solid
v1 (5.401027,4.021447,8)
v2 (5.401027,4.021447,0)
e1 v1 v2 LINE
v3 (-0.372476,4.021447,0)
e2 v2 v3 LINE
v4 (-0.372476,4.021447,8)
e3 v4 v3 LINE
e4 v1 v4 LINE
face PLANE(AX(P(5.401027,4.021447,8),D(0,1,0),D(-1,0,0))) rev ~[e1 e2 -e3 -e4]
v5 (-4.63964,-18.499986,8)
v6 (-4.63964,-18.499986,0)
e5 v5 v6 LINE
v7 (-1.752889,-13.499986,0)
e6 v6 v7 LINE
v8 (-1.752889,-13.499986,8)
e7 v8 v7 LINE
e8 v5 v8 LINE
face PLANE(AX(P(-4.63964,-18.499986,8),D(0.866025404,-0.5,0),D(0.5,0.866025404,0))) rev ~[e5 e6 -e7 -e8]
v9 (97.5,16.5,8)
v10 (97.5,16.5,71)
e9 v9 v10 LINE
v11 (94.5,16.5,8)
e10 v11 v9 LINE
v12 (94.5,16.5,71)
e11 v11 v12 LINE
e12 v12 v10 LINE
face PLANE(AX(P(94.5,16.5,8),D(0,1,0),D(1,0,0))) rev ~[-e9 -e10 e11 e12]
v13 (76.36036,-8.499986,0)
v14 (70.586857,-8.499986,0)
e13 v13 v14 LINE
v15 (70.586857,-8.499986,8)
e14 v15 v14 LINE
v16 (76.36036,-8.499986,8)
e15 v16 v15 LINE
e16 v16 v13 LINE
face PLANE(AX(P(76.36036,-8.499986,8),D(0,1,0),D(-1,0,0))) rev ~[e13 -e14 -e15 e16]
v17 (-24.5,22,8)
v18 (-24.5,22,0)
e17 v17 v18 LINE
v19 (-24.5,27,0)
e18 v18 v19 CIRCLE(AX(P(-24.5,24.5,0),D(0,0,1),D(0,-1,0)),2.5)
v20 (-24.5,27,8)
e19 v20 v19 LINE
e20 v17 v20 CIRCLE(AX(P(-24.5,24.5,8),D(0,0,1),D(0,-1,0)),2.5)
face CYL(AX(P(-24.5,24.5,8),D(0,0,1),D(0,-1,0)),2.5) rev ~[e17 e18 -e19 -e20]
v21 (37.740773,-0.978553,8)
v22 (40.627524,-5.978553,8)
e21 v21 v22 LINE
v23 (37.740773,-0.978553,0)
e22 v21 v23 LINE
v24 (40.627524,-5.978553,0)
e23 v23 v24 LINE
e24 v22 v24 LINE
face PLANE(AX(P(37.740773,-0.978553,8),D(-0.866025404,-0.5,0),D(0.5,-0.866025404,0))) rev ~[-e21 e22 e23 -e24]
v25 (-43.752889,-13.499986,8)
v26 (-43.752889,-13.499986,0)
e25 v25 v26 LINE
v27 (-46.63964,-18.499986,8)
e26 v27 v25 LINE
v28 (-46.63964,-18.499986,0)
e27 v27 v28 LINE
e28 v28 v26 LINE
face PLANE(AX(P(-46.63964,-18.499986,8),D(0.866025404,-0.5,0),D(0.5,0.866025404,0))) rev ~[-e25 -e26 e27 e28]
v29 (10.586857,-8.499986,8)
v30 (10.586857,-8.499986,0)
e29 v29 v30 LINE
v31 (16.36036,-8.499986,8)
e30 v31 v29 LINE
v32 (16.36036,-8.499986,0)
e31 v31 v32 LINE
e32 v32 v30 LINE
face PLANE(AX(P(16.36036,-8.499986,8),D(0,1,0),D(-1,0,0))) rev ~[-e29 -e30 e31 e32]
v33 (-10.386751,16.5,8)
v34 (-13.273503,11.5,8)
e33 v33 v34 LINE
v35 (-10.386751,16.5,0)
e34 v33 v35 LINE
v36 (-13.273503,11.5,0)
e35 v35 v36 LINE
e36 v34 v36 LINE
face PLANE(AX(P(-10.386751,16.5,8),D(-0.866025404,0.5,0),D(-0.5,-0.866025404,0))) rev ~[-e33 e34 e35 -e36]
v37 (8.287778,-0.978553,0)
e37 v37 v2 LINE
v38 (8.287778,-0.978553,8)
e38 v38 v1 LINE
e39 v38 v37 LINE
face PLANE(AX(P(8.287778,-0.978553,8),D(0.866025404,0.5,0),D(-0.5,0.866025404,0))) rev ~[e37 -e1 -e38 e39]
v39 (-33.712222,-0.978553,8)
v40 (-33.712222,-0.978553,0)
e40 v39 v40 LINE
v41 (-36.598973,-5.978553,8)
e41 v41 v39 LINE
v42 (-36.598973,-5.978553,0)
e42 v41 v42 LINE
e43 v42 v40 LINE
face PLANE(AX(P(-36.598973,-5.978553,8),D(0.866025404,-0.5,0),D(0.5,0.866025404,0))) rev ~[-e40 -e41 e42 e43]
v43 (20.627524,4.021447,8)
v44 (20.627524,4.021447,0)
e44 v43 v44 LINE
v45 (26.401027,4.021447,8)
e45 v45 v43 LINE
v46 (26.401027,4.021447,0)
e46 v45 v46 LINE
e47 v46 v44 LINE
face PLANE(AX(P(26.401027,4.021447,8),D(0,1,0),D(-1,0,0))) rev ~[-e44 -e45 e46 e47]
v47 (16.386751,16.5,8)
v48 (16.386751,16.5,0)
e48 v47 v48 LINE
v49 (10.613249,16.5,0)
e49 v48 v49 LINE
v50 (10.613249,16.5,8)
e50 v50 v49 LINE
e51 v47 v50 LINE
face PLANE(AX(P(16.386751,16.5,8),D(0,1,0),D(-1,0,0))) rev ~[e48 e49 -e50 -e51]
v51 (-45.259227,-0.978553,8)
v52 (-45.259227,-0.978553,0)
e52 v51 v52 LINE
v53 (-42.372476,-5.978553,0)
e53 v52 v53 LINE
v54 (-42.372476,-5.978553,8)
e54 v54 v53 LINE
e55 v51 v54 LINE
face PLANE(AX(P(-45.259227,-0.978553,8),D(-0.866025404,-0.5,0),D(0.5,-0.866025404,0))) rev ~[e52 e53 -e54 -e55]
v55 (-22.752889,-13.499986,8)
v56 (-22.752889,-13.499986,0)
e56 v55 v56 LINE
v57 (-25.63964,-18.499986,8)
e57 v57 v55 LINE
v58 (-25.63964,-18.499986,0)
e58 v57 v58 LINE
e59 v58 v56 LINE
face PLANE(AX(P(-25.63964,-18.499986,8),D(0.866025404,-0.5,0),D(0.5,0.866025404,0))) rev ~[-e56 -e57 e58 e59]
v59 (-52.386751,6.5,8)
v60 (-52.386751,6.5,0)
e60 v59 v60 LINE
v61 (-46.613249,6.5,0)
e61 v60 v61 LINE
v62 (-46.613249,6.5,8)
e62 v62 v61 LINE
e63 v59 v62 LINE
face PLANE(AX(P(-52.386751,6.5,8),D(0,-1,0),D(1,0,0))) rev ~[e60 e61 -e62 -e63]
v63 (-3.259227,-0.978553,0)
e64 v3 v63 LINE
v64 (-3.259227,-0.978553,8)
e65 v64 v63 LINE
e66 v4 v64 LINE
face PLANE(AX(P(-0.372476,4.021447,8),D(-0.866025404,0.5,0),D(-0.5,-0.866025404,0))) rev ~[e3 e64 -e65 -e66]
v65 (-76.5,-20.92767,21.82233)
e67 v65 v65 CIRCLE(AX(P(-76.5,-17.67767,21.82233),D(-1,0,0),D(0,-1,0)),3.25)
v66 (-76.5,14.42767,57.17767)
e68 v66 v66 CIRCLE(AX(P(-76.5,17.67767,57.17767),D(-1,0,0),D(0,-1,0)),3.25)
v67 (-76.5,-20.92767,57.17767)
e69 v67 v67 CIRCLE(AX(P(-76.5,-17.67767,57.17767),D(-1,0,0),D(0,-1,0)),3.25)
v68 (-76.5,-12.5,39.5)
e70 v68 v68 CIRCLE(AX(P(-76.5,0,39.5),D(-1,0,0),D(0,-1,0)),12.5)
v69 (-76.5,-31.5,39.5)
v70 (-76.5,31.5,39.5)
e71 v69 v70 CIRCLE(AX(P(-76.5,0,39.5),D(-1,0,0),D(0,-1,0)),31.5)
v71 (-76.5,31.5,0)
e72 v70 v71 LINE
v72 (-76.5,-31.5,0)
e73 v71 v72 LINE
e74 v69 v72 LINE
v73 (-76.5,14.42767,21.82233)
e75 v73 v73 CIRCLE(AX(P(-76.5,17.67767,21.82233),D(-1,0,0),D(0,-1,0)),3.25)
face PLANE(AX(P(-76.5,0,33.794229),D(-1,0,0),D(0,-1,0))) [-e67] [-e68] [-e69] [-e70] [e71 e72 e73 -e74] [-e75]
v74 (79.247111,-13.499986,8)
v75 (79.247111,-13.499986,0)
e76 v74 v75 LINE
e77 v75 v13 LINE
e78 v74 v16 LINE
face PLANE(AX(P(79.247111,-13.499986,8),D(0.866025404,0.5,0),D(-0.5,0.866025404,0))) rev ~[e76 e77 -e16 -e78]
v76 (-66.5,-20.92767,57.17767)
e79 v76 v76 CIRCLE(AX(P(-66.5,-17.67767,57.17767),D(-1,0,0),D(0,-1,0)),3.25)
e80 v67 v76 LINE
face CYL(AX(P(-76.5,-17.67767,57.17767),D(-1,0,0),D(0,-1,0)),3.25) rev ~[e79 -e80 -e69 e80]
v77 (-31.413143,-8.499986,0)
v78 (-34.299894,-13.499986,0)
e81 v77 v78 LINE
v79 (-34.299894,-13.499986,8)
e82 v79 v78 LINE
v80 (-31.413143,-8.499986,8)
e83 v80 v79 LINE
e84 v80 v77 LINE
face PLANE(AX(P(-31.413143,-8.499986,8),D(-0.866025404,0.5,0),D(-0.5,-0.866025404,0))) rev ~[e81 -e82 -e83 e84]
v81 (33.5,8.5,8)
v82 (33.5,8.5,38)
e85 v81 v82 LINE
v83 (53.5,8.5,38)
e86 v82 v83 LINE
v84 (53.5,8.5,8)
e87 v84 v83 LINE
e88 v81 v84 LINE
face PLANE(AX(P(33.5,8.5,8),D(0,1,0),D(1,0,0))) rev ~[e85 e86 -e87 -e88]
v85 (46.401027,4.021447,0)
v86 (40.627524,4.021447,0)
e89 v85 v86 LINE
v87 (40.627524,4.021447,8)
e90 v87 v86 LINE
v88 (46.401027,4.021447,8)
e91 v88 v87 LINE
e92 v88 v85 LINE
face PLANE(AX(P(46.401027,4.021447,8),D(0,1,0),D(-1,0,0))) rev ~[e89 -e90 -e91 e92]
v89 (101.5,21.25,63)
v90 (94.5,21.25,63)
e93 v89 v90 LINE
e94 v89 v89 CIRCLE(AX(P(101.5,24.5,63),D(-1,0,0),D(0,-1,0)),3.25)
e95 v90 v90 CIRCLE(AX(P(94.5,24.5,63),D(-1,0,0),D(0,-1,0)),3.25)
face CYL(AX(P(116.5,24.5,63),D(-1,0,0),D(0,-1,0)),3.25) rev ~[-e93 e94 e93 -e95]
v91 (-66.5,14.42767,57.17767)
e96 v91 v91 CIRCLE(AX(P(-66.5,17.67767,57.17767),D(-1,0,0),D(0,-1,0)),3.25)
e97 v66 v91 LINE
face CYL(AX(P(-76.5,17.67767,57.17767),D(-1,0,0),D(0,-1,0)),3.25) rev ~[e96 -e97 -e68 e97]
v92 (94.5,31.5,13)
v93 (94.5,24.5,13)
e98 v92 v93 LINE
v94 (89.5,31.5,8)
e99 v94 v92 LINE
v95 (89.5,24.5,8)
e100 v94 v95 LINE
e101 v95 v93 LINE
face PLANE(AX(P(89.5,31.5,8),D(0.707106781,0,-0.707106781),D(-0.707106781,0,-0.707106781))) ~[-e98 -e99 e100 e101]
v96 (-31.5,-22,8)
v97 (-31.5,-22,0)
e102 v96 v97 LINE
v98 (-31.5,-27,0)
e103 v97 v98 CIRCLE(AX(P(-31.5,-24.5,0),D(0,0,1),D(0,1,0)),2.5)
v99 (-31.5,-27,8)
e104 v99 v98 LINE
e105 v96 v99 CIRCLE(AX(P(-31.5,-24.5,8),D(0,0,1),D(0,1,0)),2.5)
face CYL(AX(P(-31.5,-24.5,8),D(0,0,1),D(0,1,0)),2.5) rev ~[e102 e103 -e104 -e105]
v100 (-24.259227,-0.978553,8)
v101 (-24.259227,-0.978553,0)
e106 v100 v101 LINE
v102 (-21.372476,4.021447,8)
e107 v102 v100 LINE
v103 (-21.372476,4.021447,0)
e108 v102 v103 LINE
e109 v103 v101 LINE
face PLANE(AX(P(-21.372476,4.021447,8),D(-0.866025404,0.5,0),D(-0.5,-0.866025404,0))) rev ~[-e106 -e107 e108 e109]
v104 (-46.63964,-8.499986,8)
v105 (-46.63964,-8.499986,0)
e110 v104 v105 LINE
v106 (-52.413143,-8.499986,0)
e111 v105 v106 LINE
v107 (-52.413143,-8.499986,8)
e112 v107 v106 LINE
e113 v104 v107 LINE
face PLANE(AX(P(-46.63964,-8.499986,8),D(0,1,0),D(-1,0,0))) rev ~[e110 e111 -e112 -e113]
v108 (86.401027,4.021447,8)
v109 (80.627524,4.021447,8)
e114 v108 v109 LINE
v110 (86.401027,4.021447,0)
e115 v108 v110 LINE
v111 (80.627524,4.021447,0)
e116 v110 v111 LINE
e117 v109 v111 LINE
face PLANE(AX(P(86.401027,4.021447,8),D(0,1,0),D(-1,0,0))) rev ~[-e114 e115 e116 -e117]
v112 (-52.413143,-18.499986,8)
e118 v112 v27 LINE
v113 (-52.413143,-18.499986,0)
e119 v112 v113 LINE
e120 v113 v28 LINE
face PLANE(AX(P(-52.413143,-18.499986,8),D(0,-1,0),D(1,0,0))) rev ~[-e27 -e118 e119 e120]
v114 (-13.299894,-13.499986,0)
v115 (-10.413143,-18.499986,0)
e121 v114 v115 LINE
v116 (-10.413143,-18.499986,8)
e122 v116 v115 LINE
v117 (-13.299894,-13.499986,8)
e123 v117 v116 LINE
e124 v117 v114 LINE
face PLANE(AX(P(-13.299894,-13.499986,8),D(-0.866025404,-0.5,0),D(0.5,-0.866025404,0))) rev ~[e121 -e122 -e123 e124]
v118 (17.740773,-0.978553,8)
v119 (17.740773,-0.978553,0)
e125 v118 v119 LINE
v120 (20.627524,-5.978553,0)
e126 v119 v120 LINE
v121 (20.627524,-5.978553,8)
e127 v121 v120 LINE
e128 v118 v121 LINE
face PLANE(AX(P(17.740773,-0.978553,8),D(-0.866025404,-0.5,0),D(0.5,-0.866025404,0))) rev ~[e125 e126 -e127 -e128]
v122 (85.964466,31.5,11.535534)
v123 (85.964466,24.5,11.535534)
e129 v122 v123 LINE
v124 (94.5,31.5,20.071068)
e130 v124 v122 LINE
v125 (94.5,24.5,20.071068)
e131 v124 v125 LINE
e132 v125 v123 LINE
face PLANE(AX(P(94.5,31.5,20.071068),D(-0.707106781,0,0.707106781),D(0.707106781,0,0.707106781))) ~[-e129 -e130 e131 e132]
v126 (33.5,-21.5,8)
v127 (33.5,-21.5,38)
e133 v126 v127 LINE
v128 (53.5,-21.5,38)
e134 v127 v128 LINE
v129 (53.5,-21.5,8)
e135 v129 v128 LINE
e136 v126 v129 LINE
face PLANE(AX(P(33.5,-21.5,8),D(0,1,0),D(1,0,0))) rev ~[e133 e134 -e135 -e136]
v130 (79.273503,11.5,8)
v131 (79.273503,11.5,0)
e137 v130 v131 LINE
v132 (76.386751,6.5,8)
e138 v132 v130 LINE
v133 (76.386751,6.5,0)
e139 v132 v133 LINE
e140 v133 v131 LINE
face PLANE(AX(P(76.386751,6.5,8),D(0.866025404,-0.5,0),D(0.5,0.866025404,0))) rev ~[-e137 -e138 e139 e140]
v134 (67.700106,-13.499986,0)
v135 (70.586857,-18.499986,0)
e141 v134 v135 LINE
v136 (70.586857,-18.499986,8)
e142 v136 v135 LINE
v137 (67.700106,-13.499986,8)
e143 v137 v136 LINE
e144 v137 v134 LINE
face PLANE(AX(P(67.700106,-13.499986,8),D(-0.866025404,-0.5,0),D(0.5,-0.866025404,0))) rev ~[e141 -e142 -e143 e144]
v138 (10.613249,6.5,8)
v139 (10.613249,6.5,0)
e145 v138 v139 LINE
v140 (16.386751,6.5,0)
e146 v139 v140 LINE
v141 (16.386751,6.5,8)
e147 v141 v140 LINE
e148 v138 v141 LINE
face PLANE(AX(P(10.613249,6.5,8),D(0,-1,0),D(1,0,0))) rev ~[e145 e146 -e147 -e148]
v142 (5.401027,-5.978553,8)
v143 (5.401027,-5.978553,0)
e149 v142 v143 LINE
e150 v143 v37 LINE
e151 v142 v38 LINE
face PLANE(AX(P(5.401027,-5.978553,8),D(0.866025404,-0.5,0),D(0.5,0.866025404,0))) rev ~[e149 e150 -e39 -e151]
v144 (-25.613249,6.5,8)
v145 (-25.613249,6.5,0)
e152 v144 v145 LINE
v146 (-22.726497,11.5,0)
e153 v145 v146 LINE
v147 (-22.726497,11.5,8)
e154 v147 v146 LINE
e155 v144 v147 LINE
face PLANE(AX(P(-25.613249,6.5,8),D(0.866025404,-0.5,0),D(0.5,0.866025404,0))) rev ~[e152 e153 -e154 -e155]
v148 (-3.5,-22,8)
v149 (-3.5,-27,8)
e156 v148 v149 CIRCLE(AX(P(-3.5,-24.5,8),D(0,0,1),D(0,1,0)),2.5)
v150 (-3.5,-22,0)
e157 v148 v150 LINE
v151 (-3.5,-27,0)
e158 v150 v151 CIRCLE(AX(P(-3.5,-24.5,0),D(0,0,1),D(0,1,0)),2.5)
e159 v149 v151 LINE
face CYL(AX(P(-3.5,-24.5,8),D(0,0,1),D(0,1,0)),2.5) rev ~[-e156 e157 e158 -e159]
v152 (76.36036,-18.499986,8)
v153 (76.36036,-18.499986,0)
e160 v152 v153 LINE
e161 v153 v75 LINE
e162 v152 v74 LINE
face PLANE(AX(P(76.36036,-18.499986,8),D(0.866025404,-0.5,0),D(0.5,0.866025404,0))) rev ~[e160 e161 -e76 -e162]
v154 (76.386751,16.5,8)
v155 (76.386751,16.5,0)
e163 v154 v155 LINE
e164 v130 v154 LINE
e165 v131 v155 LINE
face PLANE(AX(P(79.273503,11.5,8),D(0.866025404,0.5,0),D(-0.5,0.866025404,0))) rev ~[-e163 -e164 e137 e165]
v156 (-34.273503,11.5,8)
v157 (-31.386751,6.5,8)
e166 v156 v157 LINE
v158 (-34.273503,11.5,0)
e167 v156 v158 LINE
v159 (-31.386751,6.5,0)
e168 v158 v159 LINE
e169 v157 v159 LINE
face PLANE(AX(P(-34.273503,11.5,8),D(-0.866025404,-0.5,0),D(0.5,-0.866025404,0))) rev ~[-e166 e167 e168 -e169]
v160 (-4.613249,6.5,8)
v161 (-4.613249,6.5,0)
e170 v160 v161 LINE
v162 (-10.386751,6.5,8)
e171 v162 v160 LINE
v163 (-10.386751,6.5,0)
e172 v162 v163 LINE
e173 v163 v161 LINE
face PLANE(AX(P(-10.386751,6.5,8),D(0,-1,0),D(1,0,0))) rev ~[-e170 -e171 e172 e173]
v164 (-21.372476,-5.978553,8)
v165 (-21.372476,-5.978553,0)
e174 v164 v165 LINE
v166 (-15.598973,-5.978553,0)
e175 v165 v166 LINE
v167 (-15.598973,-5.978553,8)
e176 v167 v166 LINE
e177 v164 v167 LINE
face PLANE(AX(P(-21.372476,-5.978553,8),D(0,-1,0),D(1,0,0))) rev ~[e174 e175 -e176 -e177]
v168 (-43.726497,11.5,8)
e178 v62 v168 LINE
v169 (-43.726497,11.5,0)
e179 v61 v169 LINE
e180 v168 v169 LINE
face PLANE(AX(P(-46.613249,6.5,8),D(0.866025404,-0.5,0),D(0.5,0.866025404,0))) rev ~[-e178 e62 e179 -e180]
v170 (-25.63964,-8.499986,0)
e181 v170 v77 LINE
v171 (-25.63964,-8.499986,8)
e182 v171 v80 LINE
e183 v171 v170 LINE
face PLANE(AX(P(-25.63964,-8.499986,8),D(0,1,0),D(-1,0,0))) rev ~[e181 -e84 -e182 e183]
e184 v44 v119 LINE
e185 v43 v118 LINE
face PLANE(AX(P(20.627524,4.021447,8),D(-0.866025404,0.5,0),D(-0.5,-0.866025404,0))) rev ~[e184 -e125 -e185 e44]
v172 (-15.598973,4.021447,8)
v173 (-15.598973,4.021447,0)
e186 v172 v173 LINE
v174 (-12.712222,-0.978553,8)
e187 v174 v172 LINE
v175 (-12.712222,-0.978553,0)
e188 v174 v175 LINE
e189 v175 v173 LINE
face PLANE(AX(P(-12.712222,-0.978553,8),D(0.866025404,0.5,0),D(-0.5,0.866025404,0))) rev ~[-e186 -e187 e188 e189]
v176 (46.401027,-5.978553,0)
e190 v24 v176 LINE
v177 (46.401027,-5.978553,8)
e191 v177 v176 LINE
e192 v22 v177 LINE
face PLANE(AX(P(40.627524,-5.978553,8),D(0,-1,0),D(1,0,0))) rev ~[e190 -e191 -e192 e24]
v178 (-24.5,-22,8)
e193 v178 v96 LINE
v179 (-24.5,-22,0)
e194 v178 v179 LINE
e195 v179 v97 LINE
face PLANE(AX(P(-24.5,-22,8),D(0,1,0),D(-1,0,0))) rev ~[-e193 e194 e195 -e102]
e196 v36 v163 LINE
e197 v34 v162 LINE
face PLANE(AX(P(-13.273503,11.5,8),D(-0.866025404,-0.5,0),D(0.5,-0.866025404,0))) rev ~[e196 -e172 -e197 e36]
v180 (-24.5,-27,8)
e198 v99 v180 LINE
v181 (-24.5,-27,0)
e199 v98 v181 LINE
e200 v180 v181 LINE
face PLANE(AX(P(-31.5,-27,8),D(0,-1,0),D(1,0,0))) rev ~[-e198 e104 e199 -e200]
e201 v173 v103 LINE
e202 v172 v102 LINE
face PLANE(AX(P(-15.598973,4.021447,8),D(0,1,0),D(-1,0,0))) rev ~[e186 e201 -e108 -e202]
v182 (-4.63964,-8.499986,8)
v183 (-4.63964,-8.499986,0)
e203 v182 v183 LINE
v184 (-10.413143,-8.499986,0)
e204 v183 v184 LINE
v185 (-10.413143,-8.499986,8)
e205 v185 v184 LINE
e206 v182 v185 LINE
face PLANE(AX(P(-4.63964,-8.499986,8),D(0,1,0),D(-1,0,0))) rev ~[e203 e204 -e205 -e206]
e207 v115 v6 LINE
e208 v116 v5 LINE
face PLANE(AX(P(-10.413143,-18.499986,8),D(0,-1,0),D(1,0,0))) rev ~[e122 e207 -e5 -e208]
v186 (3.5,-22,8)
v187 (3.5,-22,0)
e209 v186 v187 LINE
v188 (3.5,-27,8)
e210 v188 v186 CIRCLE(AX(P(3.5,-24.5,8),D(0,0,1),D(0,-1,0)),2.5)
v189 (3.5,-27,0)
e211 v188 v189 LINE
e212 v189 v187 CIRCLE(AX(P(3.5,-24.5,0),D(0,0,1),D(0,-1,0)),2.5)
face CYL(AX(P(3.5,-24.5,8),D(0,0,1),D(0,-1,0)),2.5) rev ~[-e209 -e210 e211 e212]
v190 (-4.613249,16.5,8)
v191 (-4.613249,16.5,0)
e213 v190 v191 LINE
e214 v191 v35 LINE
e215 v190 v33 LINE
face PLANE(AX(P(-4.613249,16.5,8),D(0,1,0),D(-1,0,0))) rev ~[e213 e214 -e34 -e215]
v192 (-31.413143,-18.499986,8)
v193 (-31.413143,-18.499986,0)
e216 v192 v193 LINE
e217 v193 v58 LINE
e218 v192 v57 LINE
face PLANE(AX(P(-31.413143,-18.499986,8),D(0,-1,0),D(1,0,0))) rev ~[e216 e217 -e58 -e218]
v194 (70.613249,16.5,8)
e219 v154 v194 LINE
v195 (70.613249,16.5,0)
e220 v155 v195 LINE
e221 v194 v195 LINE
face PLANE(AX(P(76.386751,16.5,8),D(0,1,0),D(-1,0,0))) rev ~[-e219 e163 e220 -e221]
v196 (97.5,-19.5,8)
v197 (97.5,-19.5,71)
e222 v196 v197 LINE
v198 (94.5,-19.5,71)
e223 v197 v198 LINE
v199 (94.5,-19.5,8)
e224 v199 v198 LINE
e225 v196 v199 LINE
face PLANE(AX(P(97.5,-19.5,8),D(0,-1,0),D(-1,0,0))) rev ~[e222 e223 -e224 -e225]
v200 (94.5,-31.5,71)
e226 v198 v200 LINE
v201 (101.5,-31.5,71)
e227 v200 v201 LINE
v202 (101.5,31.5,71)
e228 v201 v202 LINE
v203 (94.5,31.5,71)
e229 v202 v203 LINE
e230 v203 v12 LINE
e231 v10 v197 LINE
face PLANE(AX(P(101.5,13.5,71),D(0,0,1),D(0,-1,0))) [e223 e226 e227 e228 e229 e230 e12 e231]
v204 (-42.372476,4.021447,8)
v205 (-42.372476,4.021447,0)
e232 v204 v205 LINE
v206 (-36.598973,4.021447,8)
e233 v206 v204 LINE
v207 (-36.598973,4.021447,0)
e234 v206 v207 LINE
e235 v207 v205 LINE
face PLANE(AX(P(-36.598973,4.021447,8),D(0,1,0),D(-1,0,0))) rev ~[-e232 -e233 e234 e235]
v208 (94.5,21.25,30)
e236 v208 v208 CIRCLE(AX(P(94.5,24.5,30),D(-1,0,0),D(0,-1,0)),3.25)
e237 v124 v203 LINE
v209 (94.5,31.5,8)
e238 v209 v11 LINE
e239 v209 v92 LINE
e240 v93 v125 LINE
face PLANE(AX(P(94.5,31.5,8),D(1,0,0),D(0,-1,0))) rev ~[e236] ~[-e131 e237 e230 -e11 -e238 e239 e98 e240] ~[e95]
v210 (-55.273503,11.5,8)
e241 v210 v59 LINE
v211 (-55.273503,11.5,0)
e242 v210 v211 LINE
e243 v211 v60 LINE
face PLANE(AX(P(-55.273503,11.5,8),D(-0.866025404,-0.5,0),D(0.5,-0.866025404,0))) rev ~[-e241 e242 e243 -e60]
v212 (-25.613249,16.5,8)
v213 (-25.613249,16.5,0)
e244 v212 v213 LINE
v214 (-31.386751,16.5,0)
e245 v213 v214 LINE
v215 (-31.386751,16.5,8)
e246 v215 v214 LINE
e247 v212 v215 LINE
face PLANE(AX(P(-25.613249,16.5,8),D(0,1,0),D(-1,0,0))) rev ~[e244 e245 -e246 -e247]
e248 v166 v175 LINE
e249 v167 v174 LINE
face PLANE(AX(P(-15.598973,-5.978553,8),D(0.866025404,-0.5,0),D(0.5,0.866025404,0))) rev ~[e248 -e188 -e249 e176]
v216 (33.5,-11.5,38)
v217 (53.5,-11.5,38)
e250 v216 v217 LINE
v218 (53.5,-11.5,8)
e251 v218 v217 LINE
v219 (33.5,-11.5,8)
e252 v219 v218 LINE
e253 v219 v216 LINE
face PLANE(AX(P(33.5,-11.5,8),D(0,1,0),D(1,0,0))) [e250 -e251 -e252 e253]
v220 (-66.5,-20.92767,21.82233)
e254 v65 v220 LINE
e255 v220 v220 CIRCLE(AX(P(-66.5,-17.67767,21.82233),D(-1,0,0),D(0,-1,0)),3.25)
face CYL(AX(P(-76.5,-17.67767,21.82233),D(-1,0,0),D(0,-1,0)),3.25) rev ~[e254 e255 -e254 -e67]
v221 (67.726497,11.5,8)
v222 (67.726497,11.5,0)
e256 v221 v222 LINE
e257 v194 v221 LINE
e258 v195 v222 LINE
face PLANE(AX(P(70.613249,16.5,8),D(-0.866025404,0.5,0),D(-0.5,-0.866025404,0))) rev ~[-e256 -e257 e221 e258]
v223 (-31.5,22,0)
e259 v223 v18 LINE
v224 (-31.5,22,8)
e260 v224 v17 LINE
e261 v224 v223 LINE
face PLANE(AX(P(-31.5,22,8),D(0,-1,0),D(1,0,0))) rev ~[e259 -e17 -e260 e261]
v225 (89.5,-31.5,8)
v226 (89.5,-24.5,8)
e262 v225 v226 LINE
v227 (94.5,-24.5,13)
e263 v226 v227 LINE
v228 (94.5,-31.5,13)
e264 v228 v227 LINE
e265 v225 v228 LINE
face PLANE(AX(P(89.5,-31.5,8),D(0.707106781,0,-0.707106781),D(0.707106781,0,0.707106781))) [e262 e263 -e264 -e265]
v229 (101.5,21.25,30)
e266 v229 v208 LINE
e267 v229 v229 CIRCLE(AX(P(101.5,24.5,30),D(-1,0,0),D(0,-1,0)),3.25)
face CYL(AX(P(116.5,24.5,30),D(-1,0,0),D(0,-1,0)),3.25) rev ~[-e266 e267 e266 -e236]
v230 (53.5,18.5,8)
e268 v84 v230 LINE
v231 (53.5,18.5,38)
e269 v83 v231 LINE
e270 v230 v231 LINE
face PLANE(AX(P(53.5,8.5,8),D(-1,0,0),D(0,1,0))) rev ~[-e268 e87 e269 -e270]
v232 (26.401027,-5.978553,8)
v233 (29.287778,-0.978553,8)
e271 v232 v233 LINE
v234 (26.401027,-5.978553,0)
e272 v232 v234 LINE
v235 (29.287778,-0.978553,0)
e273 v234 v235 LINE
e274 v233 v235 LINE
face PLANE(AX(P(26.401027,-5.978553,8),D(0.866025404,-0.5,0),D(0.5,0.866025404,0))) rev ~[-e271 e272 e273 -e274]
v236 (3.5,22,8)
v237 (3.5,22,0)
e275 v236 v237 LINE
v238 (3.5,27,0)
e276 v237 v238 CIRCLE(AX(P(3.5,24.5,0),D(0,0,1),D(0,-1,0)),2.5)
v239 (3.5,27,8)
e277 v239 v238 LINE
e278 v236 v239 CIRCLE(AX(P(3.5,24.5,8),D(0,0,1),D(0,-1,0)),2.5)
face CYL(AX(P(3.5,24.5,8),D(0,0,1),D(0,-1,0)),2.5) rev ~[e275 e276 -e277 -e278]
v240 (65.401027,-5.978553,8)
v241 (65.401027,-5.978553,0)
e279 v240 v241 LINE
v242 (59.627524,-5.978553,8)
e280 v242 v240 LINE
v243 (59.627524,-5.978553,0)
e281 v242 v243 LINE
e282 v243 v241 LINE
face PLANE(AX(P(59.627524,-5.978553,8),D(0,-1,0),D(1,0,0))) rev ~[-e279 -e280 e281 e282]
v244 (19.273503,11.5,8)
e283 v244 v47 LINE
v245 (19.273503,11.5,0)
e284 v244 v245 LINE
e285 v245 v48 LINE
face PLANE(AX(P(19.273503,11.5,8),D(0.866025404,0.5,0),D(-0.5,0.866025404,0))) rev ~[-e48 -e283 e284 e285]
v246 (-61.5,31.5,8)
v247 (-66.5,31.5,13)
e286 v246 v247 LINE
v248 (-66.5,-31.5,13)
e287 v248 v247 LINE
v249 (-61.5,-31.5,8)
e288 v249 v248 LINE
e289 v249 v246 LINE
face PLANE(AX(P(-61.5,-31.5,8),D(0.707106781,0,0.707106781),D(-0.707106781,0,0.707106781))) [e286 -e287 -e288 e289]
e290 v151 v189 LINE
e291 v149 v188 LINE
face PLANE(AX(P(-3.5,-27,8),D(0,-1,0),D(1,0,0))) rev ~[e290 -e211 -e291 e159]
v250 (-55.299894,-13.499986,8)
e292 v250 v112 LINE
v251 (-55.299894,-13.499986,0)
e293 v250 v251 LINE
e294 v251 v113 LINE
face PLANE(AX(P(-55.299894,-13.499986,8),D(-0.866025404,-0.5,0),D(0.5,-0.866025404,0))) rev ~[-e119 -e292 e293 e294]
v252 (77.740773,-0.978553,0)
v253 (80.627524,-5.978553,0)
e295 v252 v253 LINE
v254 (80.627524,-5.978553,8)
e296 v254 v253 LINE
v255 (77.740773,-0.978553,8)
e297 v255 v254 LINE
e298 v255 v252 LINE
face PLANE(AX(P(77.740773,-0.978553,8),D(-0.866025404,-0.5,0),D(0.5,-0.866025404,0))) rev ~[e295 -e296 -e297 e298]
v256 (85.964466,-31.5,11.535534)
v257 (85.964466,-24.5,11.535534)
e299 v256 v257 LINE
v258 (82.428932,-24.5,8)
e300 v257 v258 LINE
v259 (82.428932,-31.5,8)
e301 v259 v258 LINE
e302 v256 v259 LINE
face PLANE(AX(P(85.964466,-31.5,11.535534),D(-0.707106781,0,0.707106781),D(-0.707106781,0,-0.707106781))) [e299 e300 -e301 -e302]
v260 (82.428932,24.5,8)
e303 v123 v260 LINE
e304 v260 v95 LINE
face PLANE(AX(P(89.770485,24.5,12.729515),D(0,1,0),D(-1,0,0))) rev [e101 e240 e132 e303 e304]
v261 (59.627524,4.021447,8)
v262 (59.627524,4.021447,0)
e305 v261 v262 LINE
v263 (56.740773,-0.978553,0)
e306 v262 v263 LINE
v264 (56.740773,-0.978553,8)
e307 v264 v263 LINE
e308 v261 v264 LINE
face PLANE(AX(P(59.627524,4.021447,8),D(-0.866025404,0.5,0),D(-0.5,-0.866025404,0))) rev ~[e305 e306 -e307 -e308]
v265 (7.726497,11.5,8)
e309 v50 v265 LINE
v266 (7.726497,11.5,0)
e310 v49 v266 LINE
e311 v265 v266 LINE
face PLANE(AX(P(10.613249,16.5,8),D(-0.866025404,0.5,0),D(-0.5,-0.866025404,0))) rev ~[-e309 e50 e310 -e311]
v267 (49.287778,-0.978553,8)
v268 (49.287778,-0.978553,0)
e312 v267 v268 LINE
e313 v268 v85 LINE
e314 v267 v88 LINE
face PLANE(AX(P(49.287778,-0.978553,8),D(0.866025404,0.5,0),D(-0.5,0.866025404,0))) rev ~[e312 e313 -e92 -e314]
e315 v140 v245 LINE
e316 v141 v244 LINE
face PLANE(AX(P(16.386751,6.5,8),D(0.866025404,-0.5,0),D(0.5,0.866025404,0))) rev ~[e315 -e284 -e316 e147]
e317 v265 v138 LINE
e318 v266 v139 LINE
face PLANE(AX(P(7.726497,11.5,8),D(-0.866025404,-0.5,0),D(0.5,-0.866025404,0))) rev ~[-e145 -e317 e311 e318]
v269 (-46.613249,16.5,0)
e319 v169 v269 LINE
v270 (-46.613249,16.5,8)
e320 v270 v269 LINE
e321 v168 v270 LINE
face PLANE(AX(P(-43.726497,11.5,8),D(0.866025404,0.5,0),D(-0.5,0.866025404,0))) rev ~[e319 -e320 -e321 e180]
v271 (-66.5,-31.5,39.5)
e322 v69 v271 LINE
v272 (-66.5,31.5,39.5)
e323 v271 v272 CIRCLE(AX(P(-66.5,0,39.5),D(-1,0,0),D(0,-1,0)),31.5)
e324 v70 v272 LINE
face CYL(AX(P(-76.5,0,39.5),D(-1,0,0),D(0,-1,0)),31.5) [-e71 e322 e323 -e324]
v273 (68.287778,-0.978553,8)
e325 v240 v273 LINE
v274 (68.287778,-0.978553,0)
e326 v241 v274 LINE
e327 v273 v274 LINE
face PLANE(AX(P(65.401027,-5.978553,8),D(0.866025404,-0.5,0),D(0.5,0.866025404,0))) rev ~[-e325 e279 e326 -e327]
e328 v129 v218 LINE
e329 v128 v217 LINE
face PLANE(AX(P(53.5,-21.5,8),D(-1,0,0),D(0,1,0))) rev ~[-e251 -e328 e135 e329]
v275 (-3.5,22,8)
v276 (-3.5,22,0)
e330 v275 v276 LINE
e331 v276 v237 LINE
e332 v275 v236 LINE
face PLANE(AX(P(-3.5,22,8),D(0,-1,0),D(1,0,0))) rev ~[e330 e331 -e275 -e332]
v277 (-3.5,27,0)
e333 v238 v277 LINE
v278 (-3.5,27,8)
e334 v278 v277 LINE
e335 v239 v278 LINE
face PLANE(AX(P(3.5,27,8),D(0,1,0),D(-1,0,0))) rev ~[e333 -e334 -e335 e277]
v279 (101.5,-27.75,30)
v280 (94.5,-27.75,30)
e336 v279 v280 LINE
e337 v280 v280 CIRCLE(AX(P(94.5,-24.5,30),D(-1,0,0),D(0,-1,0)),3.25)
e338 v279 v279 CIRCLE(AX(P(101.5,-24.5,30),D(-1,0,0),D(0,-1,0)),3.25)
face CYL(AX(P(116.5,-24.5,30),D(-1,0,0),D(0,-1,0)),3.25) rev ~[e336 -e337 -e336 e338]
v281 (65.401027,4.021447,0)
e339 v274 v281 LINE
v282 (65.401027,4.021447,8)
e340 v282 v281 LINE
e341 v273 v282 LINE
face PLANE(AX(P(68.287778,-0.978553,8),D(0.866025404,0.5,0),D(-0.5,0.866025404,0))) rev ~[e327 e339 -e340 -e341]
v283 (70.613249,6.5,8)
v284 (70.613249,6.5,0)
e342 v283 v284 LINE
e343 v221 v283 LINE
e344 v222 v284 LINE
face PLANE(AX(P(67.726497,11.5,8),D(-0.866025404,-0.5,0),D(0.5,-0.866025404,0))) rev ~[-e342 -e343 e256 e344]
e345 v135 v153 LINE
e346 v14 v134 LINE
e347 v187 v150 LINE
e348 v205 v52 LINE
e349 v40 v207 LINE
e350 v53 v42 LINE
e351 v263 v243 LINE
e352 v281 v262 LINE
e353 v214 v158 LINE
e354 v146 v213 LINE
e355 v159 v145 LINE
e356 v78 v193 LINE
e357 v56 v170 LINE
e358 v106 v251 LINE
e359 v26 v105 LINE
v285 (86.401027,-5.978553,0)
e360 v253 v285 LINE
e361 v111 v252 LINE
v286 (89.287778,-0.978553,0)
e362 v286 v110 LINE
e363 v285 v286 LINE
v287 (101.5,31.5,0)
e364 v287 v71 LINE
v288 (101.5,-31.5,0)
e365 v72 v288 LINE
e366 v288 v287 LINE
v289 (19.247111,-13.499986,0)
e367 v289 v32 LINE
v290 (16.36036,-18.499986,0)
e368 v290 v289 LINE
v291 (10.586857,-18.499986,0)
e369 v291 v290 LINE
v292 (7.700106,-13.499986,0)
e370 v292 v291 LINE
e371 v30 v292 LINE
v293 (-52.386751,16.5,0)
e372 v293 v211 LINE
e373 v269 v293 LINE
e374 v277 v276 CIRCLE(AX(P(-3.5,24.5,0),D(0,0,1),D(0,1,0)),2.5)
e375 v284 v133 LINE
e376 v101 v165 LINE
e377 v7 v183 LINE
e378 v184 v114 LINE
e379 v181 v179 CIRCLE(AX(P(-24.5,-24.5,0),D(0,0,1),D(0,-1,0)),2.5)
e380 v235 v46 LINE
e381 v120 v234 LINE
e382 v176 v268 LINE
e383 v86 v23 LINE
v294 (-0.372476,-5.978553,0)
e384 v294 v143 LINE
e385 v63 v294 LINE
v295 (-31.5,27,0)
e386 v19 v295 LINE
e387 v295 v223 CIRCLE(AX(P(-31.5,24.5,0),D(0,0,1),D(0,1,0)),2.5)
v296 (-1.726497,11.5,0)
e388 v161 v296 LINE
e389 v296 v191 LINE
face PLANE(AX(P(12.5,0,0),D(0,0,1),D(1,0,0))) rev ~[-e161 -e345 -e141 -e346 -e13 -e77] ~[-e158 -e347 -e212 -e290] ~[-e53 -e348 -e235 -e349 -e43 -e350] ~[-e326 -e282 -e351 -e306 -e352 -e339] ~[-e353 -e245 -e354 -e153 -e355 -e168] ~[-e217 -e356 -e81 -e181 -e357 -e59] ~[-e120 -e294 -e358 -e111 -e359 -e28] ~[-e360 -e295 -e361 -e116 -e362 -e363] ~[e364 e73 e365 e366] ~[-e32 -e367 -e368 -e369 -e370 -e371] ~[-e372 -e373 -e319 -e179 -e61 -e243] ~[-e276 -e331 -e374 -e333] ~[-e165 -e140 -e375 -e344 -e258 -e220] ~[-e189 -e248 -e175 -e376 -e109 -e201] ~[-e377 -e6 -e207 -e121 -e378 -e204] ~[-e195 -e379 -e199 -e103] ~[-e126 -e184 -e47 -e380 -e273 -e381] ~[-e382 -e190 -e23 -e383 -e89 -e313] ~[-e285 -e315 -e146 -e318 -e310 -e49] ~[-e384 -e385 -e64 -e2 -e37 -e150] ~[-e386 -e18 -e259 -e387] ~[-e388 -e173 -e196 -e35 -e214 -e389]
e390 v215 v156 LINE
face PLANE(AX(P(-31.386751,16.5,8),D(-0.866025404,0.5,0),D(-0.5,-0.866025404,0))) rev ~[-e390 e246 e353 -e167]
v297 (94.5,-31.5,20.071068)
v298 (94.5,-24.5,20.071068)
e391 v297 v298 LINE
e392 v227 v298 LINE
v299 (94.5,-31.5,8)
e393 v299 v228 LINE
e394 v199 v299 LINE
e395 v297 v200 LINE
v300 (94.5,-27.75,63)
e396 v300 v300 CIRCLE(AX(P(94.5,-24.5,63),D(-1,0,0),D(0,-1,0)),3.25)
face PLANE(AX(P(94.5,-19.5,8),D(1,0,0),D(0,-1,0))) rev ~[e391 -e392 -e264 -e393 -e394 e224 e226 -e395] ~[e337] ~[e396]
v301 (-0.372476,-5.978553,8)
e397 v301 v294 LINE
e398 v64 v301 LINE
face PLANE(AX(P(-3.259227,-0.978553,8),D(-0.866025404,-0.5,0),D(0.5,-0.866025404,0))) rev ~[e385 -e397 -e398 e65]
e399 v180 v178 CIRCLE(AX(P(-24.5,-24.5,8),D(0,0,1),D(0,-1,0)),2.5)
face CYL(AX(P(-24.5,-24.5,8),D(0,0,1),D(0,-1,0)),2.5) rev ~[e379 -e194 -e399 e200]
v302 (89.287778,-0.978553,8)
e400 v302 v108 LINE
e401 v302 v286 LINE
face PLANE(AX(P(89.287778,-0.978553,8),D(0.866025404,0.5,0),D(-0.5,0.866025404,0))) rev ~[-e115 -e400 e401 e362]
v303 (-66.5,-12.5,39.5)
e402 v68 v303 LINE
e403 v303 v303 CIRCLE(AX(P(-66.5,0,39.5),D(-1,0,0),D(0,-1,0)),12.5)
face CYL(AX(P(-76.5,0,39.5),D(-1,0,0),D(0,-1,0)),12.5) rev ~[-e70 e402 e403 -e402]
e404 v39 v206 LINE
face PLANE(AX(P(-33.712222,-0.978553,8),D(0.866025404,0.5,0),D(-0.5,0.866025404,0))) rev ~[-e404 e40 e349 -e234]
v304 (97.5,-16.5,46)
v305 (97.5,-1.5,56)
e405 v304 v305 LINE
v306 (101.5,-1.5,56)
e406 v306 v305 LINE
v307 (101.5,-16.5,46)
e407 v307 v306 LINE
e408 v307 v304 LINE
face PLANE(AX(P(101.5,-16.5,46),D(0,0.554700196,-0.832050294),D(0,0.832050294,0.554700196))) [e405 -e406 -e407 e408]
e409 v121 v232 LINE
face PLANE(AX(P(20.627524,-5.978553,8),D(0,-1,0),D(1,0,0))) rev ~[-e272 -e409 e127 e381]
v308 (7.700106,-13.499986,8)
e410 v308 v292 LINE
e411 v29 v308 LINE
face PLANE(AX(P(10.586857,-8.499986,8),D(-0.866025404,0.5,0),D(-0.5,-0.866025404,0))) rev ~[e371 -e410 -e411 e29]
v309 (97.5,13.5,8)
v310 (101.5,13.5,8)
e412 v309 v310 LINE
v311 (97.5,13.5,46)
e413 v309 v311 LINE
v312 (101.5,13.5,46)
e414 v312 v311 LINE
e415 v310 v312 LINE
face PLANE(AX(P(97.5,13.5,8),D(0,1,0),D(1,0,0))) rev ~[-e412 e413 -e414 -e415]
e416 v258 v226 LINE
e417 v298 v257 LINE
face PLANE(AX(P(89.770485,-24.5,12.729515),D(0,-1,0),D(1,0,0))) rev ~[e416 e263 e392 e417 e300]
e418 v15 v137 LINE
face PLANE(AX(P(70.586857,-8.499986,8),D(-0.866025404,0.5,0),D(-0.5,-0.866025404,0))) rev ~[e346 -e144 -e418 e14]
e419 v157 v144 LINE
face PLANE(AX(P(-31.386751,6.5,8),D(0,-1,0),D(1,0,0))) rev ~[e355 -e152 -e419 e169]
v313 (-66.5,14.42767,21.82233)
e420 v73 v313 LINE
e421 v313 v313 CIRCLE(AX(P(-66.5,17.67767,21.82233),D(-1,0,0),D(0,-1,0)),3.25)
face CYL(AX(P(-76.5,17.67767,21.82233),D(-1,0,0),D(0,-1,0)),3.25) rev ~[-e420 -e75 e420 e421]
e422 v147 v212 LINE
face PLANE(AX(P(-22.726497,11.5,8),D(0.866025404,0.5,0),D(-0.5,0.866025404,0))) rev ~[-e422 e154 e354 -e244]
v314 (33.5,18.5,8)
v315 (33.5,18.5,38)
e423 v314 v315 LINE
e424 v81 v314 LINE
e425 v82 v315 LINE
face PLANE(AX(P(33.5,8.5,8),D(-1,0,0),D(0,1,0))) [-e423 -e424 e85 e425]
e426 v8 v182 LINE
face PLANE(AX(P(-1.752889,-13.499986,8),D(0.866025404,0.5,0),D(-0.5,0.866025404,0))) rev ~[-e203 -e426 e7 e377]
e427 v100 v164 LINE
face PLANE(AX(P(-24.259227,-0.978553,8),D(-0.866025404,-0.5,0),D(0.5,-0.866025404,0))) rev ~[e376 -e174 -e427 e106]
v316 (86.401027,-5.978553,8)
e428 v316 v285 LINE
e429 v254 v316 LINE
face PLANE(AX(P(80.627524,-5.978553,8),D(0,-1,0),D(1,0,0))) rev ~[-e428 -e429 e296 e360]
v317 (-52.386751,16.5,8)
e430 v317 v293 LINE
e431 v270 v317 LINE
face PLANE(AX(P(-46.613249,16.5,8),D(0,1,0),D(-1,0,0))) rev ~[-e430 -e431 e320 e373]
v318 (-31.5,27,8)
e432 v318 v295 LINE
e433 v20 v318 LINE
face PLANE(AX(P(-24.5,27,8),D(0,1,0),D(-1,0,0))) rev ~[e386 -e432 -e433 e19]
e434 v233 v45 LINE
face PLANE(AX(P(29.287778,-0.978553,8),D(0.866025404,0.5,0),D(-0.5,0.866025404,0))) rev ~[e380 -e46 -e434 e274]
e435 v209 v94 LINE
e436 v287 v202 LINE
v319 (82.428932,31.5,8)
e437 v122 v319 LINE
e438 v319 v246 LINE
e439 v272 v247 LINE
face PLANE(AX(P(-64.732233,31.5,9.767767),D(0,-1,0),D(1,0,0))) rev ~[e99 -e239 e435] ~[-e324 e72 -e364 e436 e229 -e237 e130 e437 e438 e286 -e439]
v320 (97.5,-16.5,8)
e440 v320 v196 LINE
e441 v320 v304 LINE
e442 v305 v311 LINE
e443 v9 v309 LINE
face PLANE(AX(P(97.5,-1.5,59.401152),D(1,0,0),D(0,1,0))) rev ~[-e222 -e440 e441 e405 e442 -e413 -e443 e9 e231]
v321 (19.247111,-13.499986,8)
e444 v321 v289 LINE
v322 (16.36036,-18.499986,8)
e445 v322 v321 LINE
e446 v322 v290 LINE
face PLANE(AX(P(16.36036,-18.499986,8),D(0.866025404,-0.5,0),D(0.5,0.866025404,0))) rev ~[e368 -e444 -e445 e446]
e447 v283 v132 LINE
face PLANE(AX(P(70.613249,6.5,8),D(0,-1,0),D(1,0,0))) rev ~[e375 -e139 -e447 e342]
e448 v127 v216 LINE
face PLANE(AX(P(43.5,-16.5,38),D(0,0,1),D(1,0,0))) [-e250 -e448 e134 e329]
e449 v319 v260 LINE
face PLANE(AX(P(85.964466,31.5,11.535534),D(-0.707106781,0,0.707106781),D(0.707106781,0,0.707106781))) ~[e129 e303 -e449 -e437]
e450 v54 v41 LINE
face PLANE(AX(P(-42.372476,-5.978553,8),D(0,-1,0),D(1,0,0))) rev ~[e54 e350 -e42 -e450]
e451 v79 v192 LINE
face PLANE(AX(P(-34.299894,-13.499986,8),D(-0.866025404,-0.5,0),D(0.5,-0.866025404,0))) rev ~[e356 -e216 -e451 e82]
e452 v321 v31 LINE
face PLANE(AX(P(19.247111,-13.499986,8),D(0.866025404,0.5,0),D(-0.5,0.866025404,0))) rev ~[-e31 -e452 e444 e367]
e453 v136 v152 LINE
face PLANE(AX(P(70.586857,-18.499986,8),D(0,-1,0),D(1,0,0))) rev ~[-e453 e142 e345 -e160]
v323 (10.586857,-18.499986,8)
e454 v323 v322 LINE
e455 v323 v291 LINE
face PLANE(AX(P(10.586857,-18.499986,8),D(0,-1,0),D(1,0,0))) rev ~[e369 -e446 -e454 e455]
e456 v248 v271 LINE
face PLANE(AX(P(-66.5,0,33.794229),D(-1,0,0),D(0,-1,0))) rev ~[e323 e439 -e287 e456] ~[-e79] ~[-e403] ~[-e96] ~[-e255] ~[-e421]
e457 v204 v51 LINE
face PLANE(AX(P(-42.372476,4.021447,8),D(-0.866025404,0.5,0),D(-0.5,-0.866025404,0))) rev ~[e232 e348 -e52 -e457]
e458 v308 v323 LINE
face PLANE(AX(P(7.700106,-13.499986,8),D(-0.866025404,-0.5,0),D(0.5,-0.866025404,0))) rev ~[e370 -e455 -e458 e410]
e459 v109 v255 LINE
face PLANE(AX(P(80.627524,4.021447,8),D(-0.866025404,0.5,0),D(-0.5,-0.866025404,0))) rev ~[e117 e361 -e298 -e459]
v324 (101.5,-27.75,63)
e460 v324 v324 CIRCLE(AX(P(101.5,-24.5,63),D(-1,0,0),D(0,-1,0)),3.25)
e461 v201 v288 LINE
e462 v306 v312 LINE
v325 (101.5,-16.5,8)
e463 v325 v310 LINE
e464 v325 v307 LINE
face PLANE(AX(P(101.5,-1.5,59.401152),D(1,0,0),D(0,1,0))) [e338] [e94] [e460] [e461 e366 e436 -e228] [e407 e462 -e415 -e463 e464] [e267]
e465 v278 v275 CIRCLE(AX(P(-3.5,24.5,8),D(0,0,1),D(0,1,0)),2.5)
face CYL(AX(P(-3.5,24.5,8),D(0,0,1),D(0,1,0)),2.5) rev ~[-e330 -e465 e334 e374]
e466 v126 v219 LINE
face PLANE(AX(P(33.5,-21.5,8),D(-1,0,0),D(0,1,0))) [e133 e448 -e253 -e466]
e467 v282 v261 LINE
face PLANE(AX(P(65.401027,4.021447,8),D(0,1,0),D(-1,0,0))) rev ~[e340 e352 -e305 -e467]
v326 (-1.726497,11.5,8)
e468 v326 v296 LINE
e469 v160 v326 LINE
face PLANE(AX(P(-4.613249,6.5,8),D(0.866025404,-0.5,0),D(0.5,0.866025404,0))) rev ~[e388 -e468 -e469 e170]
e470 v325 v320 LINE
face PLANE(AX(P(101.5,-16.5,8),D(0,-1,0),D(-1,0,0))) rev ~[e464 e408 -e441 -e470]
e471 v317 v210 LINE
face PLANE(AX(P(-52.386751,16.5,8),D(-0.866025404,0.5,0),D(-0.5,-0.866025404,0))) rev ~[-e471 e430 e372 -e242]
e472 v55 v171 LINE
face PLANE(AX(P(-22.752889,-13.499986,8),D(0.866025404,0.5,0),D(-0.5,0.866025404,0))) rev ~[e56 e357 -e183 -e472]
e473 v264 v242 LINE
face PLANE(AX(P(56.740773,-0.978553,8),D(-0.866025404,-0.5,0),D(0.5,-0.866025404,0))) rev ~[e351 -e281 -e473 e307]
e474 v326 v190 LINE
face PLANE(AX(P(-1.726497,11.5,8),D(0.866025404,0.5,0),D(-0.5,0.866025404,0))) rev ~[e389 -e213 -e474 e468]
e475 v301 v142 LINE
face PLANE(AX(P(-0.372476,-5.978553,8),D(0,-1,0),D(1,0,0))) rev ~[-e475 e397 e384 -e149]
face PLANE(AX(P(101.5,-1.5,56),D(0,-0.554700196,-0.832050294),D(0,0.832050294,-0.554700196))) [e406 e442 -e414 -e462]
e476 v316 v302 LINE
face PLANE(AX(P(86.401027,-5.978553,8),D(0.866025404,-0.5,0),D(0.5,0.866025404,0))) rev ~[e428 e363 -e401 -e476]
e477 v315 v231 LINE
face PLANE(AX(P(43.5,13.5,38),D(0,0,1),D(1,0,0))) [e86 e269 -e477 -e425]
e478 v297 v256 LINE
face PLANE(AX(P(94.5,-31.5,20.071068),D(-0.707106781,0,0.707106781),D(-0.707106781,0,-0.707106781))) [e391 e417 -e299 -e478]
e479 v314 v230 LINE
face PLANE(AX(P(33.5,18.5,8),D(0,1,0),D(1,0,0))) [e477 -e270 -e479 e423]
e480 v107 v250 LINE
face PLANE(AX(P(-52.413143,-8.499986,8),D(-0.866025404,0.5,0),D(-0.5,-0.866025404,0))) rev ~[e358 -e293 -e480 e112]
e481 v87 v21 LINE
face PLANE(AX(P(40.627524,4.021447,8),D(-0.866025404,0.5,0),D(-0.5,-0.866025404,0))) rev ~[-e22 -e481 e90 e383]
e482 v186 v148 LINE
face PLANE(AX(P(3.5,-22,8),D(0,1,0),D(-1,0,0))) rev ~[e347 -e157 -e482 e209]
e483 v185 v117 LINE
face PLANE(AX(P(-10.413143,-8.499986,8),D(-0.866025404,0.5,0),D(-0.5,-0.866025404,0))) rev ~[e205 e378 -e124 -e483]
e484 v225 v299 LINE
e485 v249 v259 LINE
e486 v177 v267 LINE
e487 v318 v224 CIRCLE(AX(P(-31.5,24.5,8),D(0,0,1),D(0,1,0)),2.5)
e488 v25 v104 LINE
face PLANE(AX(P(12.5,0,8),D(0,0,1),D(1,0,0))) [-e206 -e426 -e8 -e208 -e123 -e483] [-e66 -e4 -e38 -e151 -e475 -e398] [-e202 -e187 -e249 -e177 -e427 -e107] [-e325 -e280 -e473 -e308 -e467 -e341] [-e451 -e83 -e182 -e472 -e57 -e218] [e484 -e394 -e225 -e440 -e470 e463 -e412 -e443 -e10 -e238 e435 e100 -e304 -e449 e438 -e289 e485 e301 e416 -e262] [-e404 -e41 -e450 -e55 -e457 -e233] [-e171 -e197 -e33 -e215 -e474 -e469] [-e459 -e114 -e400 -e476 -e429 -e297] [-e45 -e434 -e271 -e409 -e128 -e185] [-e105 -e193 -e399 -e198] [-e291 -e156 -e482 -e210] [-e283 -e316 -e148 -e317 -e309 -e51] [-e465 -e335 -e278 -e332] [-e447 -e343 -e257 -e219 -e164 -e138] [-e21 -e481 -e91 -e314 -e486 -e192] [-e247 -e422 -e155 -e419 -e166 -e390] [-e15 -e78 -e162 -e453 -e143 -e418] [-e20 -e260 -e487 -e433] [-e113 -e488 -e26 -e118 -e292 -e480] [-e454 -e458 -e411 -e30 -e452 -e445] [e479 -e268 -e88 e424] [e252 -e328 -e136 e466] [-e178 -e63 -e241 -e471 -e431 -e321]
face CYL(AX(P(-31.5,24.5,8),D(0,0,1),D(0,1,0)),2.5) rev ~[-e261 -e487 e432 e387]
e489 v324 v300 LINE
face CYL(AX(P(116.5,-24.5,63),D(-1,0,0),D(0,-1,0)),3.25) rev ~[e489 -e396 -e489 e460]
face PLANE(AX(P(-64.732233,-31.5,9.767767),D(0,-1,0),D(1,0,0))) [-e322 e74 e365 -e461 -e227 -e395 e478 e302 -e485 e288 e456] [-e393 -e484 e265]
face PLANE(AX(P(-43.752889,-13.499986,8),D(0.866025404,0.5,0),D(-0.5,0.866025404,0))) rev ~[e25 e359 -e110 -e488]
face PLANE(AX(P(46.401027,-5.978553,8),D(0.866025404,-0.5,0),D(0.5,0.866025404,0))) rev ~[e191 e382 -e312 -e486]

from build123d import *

# Parameters (mm, degrees)
F1_DEPTH  = 8
F2_R      = 3.25
F2_R_2    = 12.5
F3_DEPTH  = 10
F4_W      = 20
F4_H      = 10
F5_DEPTH  = 30
F7_DEPTH  = 63
F9_DEPTH  = 4
F11_DEPTH = 7
F13_D     = 6.5
F13_DEPTH = 15
F13_TIP   = 1.9527970118
F15_DEPTH = 63
F17_DEPTH = 8
F19_DEPTH = 8


# Not quite as in the source:
# - a pattern or mirror of a feature is missing from the dataset's text; its kind, count and spacing are read off the source's solid


with BuildPart() as f1:
    # F0 (on Top) → F1 (new body)
    with BuildSketch(Plane.XY):
        Polygon((76.5, 31.5), (-76.5, 31.5), (-76.5, -31.5), (76.5, -31.5), (101.5, -31.5), (101.5, 31.5), align=None)
    extrude(amount=F1_DEPTH)

    # F2 (on face) → F3 (join)
    with BuildSketch(Plane(origin=(-76.5, 0, 0), x_dir=(0, -1, 0), z_dir=(-1, 0, 0))):
        with BuildLine():
            Line((31.5, 8), (31.5, 39.5))
            ThreePointArc((31.5, 39.5), (0, 71), (-31.5, 39.5))
            Line((-31.5, 39.5), (-31.5, 8))
            Line((-31.5, 8), (31.5, 8))
        make_face()
        with Locations((-17.6776695297, 21.8223304703)):
            Circle(F2_R, mode=Mode.SUBTRACT)
        with Locations((17.6776695297, 21.8223304703)):
            Circle(F2_R, mode=Mode.SUBTRACT)
        with Locations((0, 39.5)):
            Circle(F2_R_2, mode=Mode.SUBTRACT)
        with Locations((-17.6776695297, 57.1776695297)):
            Circle(F2_R, mode=Mode.SUBTRACT)
        with Locations((17.6776695297, 57.1776695297)):
            Circle(F2_R, mode=Mode.SUBTRACT)
    extrude(amount=-F3_DEPTH)

    # F4 (on face) → F5 (join)
    with BuildSketch(Plane.XY.offset(8)):
        with Locations((43.5, 13.5)):
            Rectangle(F4_W, F4_H)
        with Locations((43.5, -16.5)):
            Rectangle(F4_W, F4_H)
    extrude(amount=F5_DEPTH)

    # F6 (on face) → F7 (join)
    with BuildSketch(Plane.XY.offset(8)):
        Polygon((97.5, 13.5), (101.5, 13.5), (101.5, 31.5), (94.5, 31.5), (94.5, 16.5), (97.5, 16.5), align=None)
        Polygon((94.5, -31.5), (101.5, -31.5), (101.5, -16.5), (97.5, -16.5), (97.5, -19.5), (94.5, -19.5), align=None)
    extrude(amount=F7_DEPTH)

    # F8 (on face) → F9 (join, through all)
    with BuildSketch(Plane.YZ.offset(101.5)):
        Polygon((13.5, 71), (-16.5, 71), (-16.5, 46), (-1.5, 56), (13.5, 46), align=None)
    extrude(amount=-F9_DEPTH)

    # F10 (on face) → F11 (join)
    with BuildSketch(Plane.XZ.offset(31.5)):
        Polygon((89.5, 8), (94.5, 13), (94.5, 20.0710678119), (85.9644660941, 11.5355339059), (82.4289321881, 8), align=None)
    f11 = extrude(amount=-F11_DEPTH)

    # F11_copies: F11 across plane
    add(f11.mirror(Plane.ZX))

    # F13
    with Locations(Plane.YZ.offset(101.5)):
        with Locations((-24.5, 63), (24.5, 63), (24.5, 30), (-24.5, 30)):
            Hole(F13_D / 2, depth=F13_DEPTH)
            with Locations((0, 0, -(F13_DEPTH + F13_TIP / 2))):  # 118° drill point
                Cone(0, F13_D / 2, F13_TIP, mode=Mode.SUBTRACT)

    # F14 (on face) → F15 (join)
    with BuildSketch(Plane.XZ.offset(31.5)):
        Polygon((-66.5, 13), (-66.5, 8), (-61.5, 8), align=None)
    extrude(amount=-F15_DEPTH)

    # F16 (on face) → F17 (cut)
    with BuildSketch(Plane.XY.offset(8)):
        with BuildLine():
            ThreePointArc((-24.5, 22), (-22, 24.5), (-24.5, 27))
            Line((-24.5, 27), (-31.5, 27))
            ThreePointArc((-31.5, 27), (-34, 24.5), (-31.5, 22))
            Line((-31.5, 22), (-24.5, 22))
        make_face()
        with BuildLine():
            ThreePointArc((3.5, 22), (6, 24.5), (3.5, 27))
            Line((3.5, 27), (-3.5, 27))
            ThreePointArc((-3.5, 27), (-6, 24.5), (-3.5, 22))
            Line((-3.5, 22), (3.5, 22))
        make_face()
        with BuildLine():
            ThreePointArc((3.5, -27), (6, -24.5), (3.5, -22))
            Line((3.5, -22), (-3.5, -22))
            ThreePointArc((-3.5, -22), (-6, -24.5), (-3.5, -27))
            Line((-3.5, -27), (3.5, -27))
        make_face()
        with BuildLine():
            ThreePointArc((-24.5, -27), (-22, -24.5), (-24.5, -22))
            Line((-24.5, -22), (-31.5, -22))
            ThreePointArc((-31.5, -22), (-34, -24.5), (-31.5, -27))
            Line((-31.5, -27), (-24.5, -27))
        make_face()
    extrude(amount=-F17_DEPTH, mode=Mode.SUBTRACT)

    # F18 (on face) → F19 (cut)
    with BuildSketch(Plane.XY.offset(8)):
        Polygon((-49.5, 16.5), (-52.3867513459, 16.5), (-55.2735026919, 11.5), (-49.5, 11.5), align=None)
        Polygon((-46.6132486541, 16.5), (-49.5, 16.5), (-49.5, 11.5), (-55.2735026919, 11.5), (-52.3867513459, 6.5), (-46.6132486541, 6.5), (-43.7264973081, 11.5), align=None)
        Polygon((-42.3724755983, 4.0214471492), (-45.2592269442, -0.9785528508), (-42.3724755983, -5.9785528508), (-36.5989729064, -5.9785528508), (-33.7122215604, -0.9785528508), (-36.5989729064, 4.0214471492), align=None)
        Polygon((-31.3867513459, 16.5), (-34.2735026919, 11.5), (-31.3867513459, 6.5), (-25.6132486541, 6.5), (-22.7264973081, 11.5), (-25.6132486541, 16.5), align=None)
        Polygon((-21.3724755983, 4.0214471492), (-24.2592269442, -0.9785528508), (-21.3724755983, -5.9785528508), (-15.5989729064, -5.9785528508), (-12.7122215604, -0.9785528508), (-15.5989729064, 4.0214471492), align=None)
        Polygon((-10.3867513459, 16.5), (-13.2735026919, 11.5), (-10.3867513459, 6.5), (-4.6132486541, 6.5), (-1.7264973081, 11.5), (-4.6132486541, 16.5), align=None)
        Polygon((-0.3724755983, 4.0214471492), (-3.2592269442, -0.9785528508), (-0.3724755983, -5.9785528508), (5.4010270936, -5.9785528508), (8.2877784396, -0.9785528508), (5.4010270936, 4.0214471492), align=None)
        Polygon((10.6132486541, 16.5), (7.7264973081, 11.5), (10.6132486541, 6.5), (16.3867513459, 6.5), (19.2735026919, 11.5), (16.3867513459, 16.5), align=None)
        Polygon((20.6275244017, 4.0214471492), (17.7407730558, -0.9785528508), (20.6275244017, -5.9785528508), (26.4010270936, -5.9785528508), (29.2877784396, -0.9785528508), (26.4010270936, 4.0214471492), align=None)
        Polygon((-52.4131430724, -8.4999860695), (-55.2998944183, -13.4999860695), (-52.4131430724, -18.4999860695), (-46.6396403805, -18.4999860695), (-43.7528890345, -13.4999860695), (-46.6396403805, -8.4999860695), align=None)
        Polygon((-31.4131430724, -8.4999860695), (-34.2998944183, -13.4999860695), (-31.4131430724, -18.4999860695), (-25.6396403805, -18.4999860695), (-22.7528890345, -13.4999860695), (-25.6396403805, -8.4999860695), align=None)
        Polygon((-10.4131430724, -8.4999860695), (-13.2998944183, -13.4999860695), (-10.4131430724, -18.4999860695), (-4.6396403805, -18.4999860695), (-1.7528890345, -13.4999860695), (-4.6396403805, -8.4999860695), align=None)
        Polygon((10.5868569276, -8.4999860695), (7.7001055817, -13.4999860695), (10.5868569276, -18.4999860695), (16.3603596195, -18.4999860695), (19.2471109655, -13.4999860695), (16.3603596195, -8.4999860695), align=None)
        Polygon((77.7407730558, -0.9785528508), (80.6275244017, -5.9785528508), (86.4010270936, -5.9785528508), (89.2877784396, -0.9785528508), (86.4010270936, 4.0214471492), (80.6275244017, 4.0214471492), align=None)
        Polygon((79.2471109655, -13.4999860695), (76.3603596195, -8.4999860695), (70.5868569276, -8.4999860695), (67.7001055817, -13.4999860695), (70.5868569276, -18.4999860695), (76.3603596195, -18.4999860695), align=None)
        Polygon((76.3867513459, 16.5), (70.6132486541, 16.5), (67.7264973081, 11.5), (70.6132486541, 6.5), (76.3867513459, 6.5), (79.2735026919, 11.5), align=None)
        Polygon((68.2877784396, -0.9785528508), (65.4010270936, 4.0214471492), (59.6275244017, 4.0214471492), (56.7407730558, -0.9785528508), (59.6275244017, -5.9785528508), (65.4010270936, -5.9785528508), align=None)
        Polygon((37.7407730558, -0.9785528508), (40.6275244017, -5.9785528508), (46.4010270936, -5.9785528508), (49.2877784396, -0.9785528508), (46.4010270936, 4.0214471492), (40.6275244017, 4.0214471492), align=None)
    extrude(amount=-F19_DEPTH, mode=Mode.SUBTRACT)


solid = f1.part
